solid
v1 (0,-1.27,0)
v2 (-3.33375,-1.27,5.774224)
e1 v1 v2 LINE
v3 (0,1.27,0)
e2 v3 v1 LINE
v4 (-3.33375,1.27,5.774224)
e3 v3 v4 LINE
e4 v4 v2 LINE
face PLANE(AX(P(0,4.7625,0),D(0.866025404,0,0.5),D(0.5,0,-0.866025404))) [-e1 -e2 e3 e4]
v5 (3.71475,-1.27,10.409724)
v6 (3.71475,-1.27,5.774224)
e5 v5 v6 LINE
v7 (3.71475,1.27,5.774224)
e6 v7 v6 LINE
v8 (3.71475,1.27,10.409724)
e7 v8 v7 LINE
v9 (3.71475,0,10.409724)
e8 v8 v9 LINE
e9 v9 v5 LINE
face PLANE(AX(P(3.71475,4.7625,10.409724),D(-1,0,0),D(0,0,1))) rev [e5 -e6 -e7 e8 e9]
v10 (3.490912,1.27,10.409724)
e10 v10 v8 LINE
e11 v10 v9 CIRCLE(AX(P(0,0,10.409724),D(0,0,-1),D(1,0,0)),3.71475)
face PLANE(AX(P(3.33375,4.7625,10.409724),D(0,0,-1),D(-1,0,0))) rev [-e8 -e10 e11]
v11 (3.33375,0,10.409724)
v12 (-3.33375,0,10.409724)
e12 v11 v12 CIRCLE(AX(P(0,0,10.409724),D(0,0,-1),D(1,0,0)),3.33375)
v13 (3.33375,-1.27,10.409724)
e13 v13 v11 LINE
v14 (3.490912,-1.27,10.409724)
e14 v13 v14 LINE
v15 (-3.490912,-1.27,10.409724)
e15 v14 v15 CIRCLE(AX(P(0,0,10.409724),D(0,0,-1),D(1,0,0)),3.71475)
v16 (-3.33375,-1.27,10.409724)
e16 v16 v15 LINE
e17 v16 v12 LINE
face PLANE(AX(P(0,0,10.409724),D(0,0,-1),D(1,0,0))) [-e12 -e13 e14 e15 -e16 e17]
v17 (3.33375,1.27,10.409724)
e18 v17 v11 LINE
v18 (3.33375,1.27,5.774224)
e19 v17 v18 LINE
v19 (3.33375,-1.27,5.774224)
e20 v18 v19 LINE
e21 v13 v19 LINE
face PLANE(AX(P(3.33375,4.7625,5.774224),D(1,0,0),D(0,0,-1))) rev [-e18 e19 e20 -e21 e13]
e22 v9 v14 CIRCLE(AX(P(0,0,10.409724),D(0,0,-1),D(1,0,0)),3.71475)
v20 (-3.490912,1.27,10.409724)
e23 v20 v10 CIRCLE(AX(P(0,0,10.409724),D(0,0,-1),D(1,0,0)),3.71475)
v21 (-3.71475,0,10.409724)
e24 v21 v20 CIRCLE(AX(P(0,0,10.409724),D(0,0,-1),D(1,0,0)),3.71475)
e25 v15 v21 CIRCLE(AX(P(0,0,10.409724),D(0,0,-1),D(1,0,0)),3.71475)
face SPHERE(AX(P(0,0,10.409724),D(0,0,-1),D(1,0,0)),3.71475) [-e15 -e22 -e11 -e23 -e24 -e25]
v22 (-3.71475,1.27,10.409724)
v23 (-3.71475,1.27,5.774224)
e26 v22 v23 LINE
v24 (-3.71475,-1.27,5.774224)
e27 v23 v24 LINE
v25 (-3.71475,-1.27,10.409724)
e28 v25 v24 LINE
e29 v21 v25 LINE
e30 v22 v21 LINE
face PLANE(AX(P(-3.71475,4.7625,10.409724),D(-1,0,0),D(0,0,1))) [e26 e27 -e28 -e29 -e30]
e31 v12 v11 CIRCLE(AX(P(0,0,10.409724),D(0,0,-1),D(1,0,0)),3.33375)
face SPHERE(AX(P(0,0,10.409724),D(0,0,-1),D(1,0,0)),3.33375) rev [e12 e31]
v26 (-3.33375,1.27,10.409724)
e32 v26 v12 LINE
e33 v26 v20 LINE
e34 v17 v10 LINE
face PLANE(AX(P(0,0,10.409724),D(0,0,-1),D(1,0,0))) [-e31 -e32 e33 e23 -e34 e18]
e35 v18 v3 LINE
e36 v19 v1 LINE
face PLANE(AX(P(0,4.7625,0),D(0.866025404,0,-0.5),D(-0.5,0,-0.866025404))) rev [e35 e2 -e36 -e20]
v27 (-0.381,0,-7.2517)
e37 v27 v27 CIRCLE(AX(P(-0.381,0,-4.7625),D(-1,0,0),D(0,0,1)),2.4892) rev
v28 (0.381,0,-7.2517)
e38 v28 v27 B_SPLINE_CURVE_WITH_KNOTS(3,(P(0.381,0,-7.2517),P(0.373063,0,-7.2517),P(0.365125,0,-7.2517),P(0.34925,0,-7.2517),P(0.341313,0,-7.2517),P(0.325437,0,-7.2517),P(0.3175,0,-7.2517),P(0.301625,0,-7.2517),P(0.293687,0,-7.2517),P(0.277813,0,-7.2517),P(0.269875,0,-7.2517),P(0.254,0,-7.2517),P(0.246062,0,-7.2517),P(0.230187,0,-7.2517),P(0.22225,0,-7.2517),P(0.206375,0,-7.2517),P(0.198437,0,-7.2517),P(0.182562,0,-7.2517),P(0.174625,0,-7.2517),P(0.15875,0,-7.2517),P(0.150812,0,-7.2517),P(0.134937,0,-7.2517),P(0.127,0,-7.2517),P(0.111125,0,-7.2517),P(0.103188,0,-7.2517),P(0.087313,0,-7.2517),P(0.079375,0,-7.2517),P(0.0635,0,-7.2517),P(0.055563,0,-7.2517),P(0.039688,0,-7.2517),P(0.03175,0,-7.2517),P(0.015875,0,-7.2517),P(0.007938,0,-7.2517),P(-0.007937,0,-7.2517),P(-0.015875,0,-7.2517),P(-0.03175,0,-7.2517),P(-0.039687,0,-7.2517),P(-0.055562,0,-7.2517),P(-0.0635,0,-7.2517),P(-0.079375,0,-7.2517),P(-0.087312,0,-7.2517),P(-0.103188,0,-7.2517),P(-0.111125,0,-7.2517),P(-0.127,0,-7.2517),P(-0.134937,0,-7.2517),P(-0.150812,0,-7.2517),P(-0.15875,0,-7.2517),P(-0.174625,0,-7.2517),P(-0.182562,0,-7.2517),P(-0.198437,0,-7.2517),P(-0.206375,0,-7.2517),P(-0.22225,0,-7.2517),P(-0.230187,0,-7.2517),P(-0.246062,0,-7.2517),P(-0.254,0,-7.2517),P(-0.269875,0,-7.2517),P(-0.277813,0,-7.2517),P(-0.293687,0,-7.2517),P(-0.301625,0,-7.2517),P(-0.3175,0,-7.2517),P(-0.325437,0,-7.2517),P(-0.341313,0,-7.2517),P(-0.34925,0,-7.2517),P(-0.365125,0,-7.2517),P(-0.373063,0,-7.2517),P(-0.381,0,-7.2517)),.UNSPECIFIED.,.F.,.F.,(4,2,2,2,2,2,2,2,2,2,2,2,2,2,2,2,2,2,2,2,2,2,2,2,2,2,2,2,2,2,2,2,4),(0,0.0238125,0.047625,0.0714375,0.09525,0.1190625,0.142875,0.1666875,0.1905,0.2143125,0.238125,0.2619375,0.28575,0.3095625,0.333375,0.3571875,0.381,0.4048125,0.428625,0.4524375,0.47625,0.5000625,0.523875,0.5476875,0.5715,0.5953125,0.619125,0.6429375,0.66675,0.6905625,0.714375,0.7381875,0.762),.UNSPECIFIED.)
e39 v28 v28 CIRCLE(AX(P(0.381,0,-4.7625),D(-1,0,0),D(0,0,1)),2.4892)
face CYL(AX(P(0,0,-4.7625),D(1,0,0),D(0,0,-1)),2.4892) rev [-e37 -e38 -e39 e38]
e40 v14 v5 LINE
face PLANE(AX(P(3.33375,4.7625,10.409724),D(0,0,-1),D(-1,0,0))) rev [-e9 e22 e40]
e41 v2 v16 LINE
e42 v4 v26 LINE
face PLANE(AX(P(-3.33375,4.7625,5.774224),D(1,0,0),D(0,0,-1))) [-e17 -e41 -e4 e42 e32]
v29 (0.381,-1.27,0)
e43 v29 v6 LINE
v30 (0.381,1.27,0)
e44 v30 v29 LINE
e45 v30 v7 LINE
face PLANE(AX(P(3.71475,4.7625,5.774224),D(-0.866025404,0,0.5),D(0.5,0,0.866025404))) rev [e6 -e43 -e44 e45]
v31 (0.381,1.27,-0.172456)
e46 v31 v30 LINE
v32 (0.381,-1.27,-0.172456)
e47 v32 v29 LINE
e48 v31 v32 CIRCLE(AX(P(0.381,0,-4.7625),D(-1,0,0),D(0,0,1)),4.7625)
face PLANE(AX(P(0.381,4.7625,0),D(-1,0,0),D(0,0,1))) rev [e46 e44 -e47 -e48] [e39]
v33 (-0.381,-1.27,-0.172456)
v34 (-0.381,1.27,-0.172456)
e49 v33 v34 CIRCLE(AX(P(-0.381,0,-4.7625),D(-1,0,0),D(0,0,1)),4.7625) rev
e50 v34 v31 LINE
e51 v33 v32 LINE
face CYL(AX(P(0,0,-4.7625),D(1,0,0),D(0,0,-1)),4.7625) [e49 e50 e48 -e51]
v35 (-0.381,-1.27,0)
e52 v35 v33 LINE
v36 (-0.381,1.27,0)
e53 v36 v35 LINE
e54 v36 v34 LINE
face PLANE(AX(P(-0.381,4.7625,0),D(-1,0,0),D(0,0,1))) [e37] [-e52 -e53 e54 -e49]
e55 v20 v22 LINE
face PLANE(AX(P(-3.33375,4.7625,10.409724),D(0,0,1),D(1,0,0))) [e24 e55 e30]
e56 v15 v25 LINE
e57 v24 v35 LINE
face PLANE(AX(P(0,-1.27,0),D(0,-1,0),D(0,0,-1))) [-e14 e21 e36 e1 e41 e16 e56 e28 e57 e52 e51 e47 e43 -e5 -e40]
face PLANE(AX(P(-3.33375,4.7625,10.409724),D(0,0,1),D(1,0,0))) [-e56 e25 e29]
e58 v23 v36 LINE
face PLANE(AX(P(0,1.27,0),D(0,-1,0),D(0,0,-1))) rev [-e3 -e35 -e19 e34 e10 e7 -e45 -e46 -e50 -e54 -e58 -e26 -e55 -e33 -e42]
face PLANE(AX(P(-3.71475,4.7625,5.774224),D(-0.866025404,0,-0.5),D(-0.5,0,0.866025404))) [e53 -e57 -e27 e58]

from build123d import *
from build123d.topology import SkipClean

# Parameters (mm, degrees)
BOSS_EXTRUDE1_DEPTH = 4.7625
SKETCH2_R           = 2.4892
SKETCH2_W           = 10.40972438
SKETCH2_H           = 3.4925
CUT_EXTRUDE1_DEPTH  = 12.922988592


# Read off the part's stored shape, not the designer's step: Revolve2
with BuildPart() as part:
    # Sketch1 → Boss-Extrude1 (new, symmetric)
    with BuildSketch(Plane(origin=(0, 0, 0), x_dir=(1, 0, 0), z_dir=(0, 1, 0))):
        Polygon((0, 0), (3.33375, -5.77422438), (3.33375, -10.40972438), (3.71475, -10.40972438), (3.71475, -5.77422438), (0.381, 0), (0.381, 9.525), (0, 9.525), align=None)
    boss_extrude1 = extrude(amount=BOSS_EXTRUDE1_DEPTH, both=True)

    # Sketch2 → Cut-Extrude1 (cut, symmetric)
    with BuildSketch(Plane(origin=(0.381, 0, 0), x_dir=(0, 0, -1), z_dir=(1, 0, 0))):
        with BuildLine():
            Line((0.172455746, -1.27), (0, -1.27))
            Line((0, -1.27), (0, -4.7625))
            Line((0, -4.7625), (4.7625, -4.7625))
            ThreePointArc((4.7625, -4.7625), (1.878663038, -3.790104303), (0.172455746, -1.27))
        make_face()
        with BuildLine():
            ThreePointArc((9.525, 0), (8.130096045, -3.367596045), (4.7625, -4.7625))
            Line((4.7625, -4.7625), (9.525, -4.7625))
            Line((9.525, -4.7625), (9.525, 0))
        make_face()
        with BuildLine():
            ThreePointArc((4.762500002, 4.7625), (8.130096046, 3.367596045), (9.525, 0))
            Line((9.525, 0), (9.525, 4.7625))
            Line((9.525, 4.7625), (4.762500002, 4.7625))
        make_face()
        with BuildLine():
            Line((0, 4.7625), (0, 1.27))
            Line((0, 1.27), (0.172455746, 1.27))
            ThreePointArc((0.172455746, 1.27), (1.878663039, 3.790104303), (4.762500002, 4.7625))
            Line((4.762500002, 4.7625), (0, 4.7625))
        make_face()
        with Locations((4.7625, 0)):
            Circle(SKETCH2_R)
        with Locations((-5.20486219, 3.01625)):
            Rectangle(SKETCH2_W, SKETCH2_H)
        with Locations((-5.20486219, -3.01625)):
            Rectangle(SKETCH2_W, SKETCH2_H)
    cut_extrude1 = extrude(amount=CUT_EXTRUDE1_DEPTH, both=True, mode=Mode.SUBTRACT)

    # Mirror1: Boss-Extrude1, Cut-Extrude1 across plane
    with SkipClean():  # the faces are left unmerged after this step: merging them gives an invalid solid
        add(boss_extrude1.mirror(Plane(origin=(0, 0, 0), x_dir=(0, 0, 1), z_dir=(1, 0, 0))))
        add(cut_extrude1.mirror(Plane(origin=(0, 0, 0), x_dir=(0, 0, 1), z_dir=(1, 0, 0))), mode=Mode.SUBTRACT)

    # Revolve2 outline → Revolve2 (revolve)
    with SkipClean():  # the faces are left unmerged after this step: merging them gives an invalid solid
        with BuildSketch(Plane.XZ):
            with BuildLine():
                ThreePointArc((0, 13.74347438), (2.357317233, 12.76704161), (3.33375, 10.409724376))
                Line((3.33375, 10.409724376), (3.71475, 10.409724377))
                ThreePointArc((3.71475, 10.409724377), (2.626724917, 13.036449294), (0, 14.12447438))
                Line((0, 14.12447438), (0, 13.74347438))
            make_face()
        revolve(axis=Axis((0, 0, 0), (0, 0, 1)))


solid = part.part
